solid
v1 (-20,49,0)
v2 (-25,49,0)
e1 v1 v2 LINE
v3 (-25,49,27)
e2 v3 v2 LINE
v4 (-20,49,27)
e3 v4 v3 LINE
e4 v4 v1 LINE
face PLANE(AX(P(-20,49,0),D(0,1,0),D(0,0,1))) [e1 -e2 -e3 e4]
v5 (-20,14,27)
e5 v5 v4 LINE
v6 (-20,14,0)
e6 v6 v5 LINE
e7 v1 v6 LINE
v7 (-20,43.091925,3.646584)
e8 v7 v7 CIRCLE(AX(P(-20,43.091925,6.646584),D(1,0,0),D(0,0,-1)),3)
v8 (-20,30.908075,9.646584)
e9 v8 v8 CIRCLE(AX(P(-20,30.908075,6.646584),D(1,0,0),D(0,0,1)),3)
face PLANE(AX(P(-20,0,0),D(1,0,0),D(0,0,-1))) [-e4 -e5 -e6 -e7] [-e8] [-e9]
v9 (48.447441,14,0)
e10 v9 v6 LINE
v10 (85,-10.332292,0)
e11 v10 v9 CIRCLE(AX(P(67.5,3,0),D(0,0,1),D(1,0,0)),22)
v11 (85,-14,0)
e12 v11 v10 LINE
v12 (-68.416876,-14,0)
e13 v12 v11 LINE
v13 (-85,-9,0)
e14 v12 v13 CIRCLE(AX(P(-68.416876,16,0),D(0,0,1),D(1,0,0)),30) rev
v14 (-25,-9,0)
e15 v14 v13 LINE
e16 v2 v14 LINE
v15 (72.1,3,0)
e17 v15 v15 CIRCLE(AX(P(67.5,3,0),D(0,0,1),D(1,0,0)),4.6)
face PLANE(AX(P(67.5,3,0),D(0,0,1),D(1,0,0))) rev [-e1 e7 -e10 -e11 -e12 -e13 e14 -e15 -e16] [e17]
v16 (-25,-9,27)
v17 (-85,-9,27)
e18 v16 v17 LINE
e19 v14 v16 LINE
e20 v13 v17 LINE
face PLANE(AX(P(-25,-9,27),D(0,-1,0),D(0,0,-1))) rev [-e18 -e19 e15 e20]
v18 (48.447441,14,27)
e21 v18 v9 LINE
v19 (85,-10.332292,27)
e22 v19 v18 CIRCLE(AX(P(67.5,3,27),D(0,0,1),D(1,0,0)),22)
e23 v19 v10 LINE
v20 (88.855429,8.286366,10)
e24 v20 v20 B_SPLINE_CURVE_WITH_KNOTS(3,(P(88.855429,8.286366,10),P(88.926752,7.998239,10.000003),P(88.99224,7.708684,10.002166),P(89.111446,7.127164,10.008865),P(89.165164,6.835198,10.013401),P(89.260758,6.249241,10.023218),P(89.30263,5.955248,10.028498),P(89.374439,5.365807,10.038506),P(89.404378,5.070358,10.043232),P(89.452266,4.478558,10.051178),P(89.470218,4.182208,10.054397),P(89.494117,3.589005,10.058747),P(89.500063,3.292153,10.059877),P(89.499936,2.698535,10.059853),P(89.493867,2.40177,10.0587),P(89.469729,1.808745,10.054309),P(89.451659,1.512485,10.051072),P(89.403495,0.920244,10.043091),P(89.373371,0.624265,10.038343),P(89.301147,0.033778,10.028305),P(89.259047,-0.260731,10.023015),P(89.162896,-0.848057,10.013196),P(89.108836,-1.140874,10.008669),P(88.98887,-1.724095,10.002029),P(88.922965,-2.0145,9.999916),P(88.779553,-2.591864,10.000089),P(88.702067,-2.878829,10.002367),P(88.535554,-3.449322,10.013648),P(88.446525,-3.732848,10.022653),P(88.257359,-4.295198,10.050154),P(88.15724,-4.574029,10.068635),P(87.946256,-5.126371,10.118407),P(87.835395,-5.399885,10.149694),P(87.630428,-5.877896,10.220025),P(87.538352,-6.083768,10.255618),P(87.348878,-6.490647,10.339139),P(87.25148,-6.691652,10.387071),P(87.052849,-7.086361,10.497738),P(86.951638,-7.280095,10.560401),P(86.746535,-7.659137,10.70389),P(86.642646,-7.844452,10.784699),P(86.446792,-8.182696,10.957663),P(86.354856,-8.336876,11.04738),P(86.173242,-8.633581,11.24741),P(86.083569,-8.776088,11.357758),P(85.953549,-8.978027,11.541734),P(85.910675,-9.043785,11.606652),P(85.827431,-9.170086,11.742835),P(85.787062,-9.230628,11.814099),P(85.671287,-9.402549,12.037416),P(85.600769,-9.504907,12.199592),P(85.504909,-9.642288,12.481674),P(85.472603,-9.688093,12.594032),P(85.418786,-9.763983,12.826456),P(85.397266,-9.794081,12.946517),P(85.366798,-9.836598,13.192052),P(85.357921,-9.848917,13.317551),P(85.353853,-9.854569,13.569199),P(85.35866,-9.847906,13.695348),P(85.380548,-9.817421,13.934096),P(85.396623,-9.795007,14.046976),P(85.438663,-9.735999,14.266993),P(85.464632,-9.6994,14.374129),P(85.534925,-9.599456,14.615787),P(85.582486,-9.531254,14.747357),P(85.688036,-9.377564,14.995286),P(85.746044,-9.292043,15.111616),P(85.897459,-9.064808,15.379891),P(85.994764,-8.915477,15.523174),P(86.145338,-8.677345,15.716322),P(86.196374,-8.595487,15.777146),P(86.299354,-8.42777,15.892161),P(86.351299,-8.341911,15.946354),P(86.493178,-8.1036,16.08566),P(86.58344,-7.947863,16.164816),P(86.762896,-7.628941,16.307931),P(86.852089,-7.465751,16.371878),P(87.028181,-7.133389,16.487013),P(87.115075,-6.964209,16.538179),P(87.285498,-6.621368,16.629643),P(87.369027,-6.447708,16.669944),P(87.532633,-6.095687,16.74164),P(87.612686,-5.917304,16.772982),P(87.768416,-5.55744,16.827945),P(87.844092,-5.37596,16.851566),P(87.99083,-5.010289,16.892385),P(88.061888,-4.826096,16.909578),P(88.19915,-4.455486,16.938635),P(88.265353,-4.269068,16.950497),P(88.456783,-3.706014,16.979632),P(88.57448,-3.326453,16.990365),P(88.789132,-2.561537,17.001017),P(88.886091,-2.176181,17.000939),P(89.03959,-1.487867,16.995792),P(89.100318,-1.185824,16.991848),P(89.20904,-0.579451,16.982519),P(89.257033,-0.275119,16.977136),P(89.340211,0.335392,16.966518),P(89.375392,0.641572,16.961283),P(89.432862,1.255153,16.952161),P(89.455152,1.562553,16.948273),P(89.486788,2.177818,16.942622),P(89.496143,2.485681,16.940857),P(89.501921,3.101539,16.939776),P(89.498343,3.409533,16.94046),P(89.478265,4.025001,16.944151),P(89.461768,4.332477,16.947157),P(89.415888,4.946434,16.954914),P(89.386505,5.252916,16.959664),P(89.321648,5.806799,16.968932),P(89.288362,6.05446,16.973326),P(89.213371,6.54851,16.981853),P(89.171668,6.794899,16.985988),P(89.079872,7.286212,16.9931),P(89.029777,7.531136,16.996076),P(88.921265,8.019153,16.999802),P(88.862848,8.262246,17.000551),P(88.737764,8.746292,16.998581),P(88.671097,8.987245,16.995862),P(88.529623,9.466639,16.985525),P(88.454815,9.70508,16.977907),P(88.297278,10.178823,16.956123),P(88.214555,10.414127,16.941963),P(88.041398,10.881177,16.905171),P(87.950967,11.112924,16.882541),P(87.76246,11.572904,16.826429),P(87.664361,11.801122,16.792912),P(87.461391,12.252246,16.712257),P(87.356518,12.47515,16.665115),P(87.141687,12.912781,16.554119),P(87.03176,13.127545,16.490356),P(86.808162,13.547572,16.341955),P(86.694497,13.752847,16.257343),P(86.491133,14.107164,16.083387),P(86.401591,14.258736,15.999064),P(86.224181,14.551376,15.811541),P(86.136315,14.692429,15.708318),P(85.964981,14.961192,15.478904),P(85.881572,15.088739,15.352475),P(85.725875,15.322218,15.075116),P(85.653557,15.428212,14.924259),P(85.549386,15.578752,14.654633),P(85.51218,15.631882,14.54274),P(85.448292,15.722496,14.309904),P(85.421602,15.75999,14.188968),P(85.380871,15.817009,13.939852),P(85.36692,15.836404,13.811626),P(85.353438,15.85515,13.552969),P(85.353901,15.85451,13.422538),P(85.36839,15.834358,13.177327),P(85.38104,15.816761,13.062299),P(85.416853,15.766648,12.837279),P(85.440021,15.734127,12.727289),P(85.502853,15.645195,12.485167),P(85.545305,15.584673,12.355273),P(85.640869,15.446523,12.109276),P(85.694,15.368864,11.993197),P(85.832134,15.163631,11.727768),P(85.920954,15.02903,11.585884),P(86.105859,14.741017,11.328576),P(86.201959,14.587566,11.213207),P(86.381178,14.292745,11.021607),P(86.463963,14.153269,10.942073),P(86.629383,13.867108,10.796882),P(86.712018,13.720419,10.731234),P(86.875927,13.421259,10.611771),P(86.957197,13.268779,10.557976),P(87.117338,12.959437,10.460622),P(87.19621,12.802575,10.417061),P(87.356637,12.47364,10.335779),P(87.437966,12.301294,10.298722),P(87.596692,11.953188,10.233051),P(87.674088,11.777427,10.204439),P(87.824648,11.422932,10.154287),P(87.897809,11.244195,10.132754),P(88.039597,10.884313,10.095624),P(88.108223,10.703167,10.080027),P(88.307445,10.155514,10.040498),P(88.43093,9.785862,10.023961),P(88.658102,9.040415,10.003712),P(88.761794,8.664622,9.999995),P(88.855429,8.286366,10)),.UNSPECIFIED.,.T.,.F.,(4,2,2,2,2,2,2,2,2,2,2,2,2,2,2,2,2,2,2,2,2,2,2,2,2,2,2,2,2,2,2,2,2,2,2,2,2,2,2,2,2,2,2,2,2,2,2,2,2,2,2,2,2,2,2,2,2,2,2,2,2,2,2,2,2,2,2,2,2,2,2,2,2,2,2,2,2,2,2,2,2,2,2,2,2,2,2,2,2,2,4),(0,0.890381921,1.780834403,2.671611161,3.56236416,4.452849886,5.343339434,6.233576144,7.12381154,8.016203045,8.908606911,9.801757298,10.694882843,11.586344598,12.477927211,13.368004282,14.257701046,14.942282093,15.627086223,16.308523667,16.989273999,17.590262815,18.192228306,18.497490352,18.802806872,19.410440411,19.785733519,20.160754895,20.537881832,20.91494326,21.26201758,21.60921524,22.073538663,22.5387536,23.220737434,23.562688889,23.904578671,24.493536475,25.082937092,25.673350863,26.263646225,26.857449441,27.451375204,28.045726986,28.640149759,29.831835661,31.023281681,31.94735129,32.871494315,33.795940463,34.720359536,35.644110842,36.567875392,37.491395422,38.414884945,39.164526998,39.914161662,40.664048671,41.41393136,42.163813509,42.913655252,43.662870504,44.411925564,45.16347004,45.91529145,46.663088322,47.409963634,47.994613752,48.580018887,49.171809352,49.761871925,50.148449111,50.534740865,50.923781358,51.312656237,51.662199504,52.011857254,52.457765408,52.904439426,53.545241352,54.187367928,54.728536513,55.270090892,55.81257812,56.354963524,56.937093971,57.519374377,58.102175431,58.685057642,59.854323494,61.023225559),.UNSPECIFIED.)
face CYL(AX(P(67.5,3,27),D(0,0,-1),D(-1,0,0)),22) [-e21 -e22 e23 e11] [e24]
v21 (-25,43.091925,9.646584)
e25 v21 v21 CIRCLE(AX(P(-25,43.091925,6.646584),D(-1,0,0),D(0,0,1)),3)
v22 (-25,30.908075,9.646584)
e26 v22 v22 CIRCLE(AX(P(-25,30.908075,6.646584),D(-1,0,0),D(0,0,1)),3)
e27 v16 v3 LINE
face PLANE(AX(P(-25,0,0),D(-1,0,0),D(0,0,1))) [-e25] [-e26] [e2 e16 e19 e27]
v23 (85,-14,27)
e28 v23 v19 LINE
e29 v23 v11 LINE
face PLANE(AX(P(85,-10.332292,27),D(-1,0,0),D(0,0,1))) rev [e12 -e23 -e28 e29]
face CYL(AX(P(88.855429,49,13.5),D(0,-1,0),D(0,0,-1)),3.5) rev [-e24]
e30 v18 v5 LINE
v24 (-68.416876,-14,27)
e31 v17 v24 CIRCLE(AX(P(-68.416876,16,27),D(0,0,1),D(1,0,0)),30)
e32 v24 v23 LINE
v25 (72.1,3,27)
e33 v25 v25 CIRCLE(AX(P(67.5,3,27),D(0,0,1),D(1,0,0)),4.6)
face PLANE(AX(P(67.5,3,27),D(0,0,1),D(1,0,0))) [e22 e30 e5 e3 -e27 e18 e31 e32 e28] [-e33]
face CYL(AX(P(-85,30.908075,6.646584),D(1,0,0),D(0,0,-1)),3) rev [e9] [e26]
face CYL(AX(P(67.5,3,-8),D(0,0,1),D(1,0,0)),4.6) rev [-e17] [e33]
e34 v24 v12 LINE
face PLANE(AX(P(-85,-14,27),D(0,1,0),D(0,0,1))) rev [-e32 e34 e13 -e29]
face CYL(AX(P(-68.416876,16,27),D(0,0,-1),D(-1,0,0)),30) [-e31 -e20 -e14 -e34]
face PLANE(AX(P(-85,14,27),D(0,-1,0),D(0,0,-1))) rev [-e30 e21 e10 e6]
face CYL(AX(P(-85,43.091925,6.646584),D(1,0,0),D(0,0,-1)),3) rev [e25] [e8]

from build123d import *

# Parameters (mm, degrees)
RESSALTO_EXTRUS_O2_DEPTH = 27
ESBO_O2_R                = 4.6
CORTE_EXTRUS_O1_DEPTH    = 35
CORTE_EXTRUS_O3_DEPTH    = 60
ESBO_O7_W                = 27
ESBO_O7_H                = 35
RESSALTO_EXTRUS_O3_DEPTH = 5
ESBO_O8_R                = 3
CORTE_EXTRUS_O4_DEPTH    = 123.96442575
FILETE1_R                = 30
ESBO_O12_R               = 3.5
CORTE_EXTRUS_O5_DEPTH    = 113.730874209


with BuildPart() as part:
    # Esboço1 → Ressalto-extrusão2 (new body)
    with BuildSketch(Plane.XY):
        with BuildLine():
            Line((-85, -14), (85, -14))
            Line((85, -14), (85, -10.332291626))
            ThreePointArc((85, -10.332291626), (79.690886502, 21.313445506), (48.447441117, 14))
            Line((48.447441117, 14), (-85, 14))
            Line((-85, 14), (-85, -14))
        make_face()
    extrude(amount=RESSALTO_EXTRUS_O2_DEPTH)

    # Esboço2 → Corte-extrusão1 (cut)
    with BuildSketch(Plane.XY.offset(27)):
        with Locations((67.5, 3)):
            Circle(ESBO_O2_R)
    extrude(amount=-CORTE_EXTRUS_O1_DEPTH, mode=Mode.SUBTRACT)

    # Esboço6 → Corte-extrusão3 (cut)
    with BuildSketch(Plane.ZY.offset(85)):
        Polygon((5, -9), (22, -9), (27, -9), (27, 14), (0, 14), (0, -9), align=None)
    extrude(amount=-CORTE_EXTRUS_O3_DEPTH, mode=Mode.SUBTRACT)

    # Esboço7 → Ressalto-extrusão3 (add)
    with BuildSketch(Plane.ZY.offset(25)):
        with Locations((13.5, 31.5)):
            Rectangle(ESBO_O7_W, ESBO_O7_H)
    extrude(amount=-RESSALTO_EXTRUS_O3_DEPTH)

    # Esboço8 → Corte-extrusão4 (cut, through all)
    with BuildSketch(Plane(origin=(-20, 0, 0), x_dir=(0, 0, -1), z_dir=(1, 0, 0))):
        with Locations((-6.646583991, 43.091925341)):
            Circle(ESBO_O8_R)
        with Locations(Location((-6.646583991, 30.908074659, 0), (0, 0, 180))):
            Circle(ESBO_O8_R)
    extrude(amount=-CORTE_EXTRUS_O4_DEPTH, mode=Mode.SUBTRACT)

    # Filete1
    # the kernel refuses this fillet: 30 mm, written as the material it takes off along each edge
    with BuildSketch(Plane(origin=(-85, -14, -41.457809879), x_dir=(0, 1, 0), z_dir=(0, 0, 1))) as filete1_piece_1:
        with BuildLine():
            CenterArc((30, -16.583123952), FILETE1_R, 146.442690238, 33.557309762)
            Line((0, -16.583123952), (-0.6, -16.583123952))
            Line((-0.6, -16.583123952), (-0.6, 0))
            Line((-0.6, 0), (0, 0.6))
            ThreePointArc((0, 0.6), (2.5, 0.6), (4.5, 0.331662479))
            Line((4.5, 0.331662479), (5, 0))
        make_face()
    extrude(amount=109.915619759, mode=Mode.SUBTRACT)

    # Esboço12 → Corte-extrusão5 (cut, through all)
    with BuildSketch(Plane.XZ.offset(14)):
        with Locations((88.855428665, 13.5)):
            Circle(ESBO_O12_R)
    extrude(amount=-CORTE_EXTRUS_O5_DEPTH, mode=Mode.SUBTRACT)


solid = part.part
